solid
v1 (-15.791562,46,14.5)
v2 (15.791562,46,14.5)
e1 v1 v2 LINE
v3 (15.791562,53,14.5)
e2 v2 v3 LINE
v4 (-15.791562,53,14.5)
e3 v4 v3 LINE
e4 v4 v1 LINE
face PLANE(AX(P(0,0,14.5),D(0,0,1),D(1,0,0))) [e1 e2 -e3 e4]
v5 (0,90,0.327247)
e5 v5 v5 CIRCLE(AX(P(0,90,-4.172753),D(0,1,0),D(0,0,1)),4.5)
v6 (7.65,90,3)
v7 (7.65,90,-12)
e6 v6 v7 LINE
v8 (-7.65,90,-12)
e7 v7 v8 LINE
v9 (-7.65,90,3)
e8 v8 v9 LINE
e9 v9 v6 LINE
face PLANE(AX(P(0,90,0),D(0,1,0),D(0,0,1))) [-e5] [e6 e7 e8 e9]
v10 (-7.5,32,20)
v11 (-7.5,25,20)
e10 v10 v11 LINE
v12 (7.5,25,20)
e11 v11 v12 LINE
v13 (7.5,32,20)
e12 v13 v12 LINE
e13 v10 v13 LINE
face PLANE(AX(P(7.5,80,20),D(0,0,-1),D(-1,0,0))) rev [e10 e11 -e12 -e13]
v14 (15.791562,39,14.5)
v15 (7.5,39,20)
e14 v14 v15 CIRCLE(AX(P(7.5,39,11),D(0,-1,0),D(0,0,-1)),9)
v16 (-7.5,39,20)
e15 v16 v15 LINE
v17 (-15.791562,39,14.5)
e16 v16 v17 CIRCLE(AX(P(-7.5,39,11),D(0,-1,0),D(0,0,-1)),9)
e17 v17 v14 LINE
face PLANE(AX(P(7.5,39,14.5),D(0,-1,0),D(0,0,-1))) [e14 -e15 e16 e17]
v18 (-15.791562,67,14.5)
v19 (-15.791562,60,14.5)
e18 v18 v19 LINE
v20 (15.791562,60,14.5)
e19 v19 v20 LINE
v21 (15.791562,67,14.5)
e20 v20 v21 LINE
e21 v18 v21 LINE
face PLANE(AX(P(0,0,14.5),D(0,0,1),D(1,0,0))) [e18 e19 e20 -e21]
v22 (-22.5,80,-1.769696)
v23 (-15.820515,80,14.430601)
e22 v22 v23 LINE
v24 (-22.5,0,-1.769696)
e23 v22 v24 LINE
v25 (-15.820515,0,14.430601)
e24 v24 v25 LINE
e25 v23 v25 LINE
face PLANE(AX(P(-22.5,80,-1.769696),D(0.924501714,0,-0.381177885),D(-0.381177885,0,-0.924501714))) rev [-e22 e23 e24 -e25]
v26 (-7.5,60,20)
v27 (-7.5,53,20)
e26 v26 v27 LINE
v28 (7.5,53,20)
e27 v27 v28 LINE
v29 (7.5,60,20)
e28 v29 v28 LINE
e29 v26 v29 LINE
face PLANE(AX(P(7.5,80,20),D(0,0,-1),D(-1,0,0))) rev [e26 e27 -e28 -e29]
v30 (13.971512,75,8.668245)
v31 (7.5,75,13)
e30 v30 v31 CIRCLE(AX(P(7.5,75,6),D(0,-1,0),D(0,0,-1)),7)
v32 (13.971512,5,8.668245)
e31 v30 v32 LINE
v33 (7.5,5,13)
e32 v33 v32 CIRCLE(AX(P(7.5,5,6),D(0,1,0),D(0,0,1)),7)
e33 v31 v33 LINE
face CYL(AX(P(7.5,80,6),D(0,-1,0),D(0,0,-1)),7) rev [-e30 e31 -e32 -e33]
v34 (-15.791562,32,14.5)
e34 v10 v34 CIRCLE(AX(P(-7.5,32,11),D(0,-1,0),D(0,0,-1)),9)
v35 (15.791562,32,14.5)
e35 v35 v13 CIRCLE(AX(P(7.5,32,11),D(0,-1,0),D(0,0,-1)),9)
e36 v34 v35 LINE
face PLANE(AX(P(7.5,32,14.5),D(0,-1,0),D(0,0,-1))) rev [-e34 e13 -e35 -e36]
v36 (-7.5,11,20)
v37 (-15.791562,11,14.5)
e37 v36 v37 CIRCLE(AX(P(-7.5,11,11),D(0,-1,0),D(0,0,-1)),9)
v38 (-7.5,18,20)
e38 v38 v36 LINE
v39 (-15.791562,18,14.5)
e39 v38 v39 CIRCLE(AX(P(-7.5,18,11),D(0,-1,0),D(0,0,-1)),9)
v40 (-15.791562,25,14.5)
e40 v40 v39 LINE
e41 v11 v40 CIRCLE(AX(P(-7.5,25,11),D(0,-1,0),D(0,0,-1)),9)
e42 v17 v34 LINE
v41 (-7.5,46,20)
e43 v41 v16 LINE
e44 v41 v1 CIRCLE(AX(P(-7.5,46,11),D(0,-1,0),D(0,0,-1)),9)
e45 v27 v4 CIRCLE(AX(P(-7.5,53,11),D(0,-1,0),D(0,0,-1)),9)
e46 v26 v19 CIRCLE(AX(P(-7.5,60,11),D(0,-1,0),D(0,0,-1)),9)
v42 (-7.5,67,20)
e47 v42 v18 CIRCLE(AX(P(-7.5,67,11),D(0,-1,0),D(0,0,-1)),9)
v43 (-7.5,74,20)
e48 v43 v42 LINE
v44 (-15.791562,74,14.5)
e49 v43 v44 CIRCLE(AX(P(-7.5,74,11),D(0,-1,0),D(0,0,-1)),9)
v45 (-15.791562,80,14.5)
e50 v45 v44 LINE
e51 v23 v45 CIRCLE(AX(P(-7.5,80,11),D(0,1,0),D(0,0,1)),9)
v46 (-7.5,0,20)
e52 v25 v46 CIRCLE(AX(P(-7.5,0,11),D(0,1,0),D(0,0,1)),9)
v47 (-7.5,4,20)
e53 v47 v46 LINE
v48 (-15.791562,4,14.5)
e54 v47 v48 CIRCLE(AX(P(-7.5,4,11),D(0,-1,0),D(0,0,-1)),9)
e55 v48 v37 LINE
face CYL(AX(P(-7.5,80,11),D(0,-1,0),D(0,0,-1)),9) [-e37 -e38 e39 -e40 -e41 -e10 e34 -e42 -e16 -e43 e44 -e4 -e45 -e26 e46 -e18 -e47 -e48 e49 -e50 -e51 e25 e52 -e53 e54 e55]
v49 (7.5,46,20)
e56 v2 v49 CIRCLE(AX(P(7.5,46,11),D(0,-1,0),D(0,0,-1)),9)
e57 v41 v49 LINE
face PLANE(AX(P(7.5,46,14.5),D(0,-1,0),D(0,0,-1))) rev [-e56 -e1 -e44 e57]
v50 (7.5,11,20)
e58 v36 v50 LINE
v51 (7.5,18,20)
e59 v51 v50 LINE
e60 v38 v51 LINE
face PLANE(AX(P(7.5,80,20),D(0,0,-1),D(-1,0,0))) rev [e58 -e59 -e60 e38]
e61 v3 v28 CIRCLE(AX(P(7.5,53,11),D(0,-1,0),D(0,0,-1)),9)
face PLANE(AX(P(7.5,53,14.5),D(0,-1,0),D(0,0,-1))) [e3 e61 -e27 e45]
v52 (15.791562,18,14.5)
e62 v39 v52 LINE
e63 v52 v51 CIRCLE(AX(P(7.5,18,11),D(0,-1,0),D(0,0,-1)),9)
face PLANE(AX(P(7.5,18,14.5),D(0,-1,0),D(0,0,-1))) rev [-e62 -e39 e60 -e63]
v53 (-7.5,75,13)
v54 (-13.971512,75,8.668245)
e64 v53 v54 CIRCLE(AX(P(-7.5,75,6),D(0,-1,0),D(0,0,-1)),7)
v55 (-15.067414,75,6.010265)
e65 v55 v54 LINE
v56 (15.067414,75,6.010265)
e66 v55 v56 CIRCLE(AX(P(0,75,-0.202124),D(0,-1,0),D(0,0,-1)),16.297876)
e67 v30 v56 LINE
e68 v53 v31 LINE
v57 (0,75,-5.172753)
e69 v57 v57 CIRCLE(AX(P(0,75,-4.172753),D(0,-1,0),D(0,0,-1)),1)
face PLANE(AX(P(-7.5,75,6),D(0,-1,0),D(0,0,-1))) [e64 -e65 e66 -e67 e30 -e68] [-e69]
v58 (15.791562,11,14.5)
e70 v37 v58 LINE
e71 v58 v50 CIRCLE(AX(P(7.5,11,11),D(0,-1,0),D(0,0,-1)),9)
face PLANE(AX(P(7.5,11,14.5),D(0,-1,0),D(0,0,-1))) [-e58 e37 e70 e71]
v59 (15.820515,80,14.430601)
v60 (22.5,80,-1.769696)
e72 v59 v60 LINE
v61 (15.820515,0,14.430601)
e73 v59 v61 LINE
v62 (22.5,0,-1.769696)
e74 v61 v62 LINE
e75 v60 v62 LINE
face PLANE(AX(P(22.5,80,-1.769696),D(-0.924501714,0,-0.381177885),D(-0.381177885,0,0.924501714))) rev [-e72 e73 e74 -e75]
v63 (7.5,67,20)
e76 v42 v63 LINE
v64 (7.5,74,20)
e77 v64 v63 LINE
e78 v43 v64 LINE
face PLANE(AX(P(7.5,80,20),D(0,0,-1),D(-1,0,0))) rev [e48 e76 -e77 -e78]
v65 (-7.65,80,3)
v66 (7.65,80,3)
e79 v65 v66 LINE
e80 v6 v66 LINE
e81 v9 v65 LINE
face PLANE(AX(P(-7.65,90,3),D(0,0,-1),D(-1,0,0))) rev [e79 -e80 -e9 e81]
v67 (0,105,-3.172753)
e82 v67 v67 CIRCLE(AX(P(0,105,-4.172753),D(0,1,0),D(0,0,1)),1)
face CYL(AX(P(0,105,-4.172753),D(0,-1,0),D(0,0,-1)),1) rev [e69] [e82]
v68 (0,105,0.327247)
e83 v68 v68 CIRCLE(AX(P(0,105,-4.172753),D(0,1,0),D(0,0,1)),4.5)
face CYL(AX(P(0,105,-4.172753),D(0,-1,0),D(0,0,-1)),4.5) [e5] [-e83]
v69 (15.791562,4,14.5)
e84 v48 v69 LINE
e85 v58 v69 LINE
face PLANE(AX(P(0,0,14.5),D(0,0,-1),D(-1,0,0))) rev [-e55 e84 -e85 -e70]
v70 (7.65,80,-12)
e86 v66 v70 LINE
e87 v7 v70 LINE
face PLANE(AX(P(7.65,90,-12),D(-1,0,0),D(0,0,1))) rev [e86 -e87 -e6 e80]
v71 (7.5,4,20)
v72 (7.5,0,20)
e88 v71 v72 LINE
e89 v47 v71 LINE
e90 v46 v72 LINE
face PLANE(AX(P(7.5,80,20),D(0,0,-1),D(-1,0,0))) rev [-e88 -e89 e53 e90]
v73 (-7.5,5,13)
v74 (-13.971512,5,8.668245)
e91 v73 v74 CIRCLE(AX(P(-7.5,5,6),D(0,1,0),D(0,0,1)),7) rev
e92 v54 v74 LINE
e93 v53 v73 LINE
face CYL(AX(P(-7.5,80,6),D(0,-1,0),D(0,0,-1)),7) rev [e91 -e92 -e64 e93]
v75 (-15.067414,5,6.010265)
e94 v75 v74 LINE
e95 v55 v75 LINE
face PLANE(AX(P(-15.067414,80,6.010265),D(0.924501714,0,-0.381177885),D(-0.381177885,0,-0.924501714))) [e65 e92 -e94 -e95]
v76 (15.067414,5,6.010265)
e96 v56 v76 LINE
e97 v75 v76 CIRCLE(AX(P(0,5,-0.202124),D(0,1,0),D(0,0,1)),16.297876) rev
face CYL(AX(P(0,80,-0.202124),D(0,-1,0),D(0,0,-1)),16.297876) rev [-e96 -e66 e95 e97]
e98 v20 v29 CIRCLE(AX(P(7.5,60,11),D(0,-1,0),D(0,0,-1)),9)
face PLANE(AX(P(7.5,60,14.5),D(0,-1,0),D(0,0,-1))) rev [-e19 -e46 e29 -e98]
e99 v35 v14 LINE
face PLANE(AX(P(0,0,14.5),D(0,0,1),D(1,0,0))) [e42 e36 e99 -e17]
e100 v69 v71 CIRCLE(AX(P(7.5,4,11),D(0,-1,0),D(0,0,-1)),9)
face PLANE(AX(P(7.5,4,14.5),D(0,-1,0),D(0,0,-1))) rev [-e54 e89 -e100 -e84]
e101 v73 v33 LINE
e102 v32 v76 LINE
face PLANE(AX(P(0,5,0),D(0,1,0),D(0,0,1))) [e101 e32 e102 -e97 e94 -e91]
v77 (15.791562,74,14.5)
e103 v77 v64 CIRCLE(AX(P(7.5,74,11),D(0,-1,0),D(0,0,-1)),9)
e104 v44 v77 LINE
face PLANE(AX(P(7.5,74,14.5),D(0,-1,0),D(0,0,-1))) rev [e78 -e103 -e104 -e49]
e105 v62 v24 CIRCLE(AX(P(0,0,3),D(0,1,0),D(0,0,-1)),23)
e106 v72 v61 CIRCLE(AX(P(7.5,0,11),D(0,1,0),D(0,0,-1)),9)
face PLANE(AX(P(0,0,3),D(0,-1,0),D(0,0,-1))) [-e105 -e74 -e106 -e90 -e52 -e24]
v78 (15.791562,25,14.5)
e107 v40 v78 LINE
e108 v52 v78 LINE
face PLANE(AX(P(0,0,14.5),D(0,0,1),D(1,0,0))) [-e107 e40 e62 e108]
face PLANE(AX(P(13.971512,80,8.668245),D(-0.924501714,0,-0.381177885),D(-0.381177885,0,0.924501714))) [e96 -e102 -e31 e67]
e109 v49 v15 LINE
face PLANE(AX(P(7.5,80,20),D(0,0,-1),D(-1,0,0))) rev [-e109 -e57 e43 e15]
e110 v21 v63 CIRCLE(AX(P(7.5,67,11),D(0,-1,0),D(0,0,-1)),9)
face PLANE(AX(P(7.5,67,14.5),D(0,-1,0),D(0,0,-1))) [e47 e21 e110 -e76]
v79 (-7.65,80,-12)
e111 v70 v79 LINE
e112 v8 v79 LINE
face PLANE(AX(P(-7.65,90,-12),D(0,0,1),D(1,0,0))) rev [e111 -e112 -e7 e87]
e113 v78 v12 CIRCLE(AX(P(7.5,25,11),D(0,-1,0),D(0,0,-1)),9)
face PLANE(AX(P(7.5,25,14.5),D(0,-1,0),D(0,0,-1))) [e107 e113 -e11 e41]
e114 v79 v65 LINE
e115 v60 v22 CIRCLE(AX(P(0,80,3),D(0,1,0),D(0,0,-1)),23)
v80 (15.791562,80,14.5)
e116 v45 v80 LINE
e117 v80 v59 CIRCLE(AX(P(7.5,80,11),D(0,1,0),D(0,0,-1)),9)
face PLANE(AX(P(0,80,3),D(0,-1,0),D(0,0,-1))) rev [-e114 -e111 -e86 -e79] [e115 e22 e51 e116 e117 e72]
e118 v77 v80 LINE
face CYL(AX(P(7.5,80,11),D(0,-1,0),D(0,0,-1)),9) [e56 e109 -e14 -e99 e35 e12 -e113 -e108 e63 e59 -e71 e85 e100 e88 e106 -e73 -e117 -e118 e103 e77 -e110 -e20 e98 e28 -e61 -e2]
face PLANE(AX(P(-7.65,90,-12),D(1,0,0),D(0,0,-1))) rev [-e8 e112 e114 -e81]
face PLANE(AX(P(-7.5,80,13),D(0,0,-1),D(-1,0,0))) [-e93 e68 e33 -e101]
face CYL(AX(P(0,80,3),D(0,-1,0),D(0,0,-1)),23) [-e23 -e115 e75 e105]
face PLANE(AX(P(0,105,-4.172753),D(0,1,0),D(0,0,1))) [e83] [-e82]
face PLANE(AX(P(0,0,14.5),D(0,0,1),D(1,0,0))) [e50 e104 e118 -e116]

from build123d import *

# Parameters (mm, degrees)
BOSS_EXTRUDE1_DEPTH     = 80
BOSS_EXTRUDE2_DEPTH     = 5
BOSS_EXTRUDE3_START     = 75
BOSS_EXTRUDE3_DEPTH     = 5
CUT_EXTRUDE1_START      = 20
SKETCH2_W               = 31.64103086
SKETCH2_H               = 7
SKETCH2_H_2             = 6
CUT_EXTRUDE1_DEPTH      = 5.5
CROQUIS1_W              = 15.3
CROQUIS1_H              = 15
SALIENTE_EXTRUIR1_DEPTH = 10
CROQUIS2_R              = 4.5
CROQUIS2_R_2            = 1
SALIENTE_EXTRUIR2_DEPTH = 15
CORTAR_EXTRUIR1_START   = -24
CROQUIS2_2_R            = 1
CORTAR_EXTRUIR1_DEPTH   = 24


# Read off the part's stored shape, not the designer's step: Boss-Extrude3
with BuildPart() as part:
    # Sketch1 → Boss-Extrude1 (new body)
    with BuildSketch(Plane(origin=(0, 0, 0), x_dir=(1, 0, 0), z_dir=(0, 1, 0))):
        with BuildLine():
            Line((7.5, -20), (-7.5, -20))
            ThreePointArc((-7.5, -20), (-12.50622569, -18.479151312), (-15.82051543, -14.430600965))
            Line((-15.82051543, -14.430600965), (-22.5, 1.769696007))
            ThreePointArc((-22.5, 1.769696007), (-14.479243624, 14.870408615), (0, 20))
            ThreePointArc((0, 20), (14.479243624, 14.870408615), (22.5, 1.769696007))
            Line((22.5, 1.769696007), (15.82051543, -14.430600965))
            ThreePointArc((15.82051543, -14.430600965), (12.50622569, -18.479151312), (7.5, -20))
        make_face()
        with BuildLine():
            Line((-7.5, -13), (7.5, -13))
            ThreePointArc((7.5, -13), (11.393731092, -11.817117687), (13.971512001, -8.668245195))
            Line((13.971512001, -8.668245195), (15.06741388, -6.010265271))
            ThreePointArc((15.06741388, -6.010265271), (0, 16.5), (-15.06741388, -6.010265271))
            Line((-15.06741388, -6.010265271), (-13.971512001, -8.668245195))
            ThreePointArc((-13.971512001, -8.668245195), (-11.393731092, -11.817117687), (-7.5, -13))
        make_face(mode=Mode.SUBTRACT)
    extrude(amount=BOSS_EXTRUDE1_DEPTH)

    # Sketch1<2> → Boss-Extrude2 (add)
    with BuildSketch(Plane(origin=(0, 0, 0), x_dir=(1, 0, 0), z_dir=(0, 1, 0))):
        with BuildLine():
            ThreePointArc((-13.971512001, -8.668245195), (-11.393731092, -11.817117687), (-7.5, -13))
            Line((-7.5, -13), (7.5, -13))
            ThreePointArc((7.5, -13), (11.393731092, -11.817117687), (13.971512001, -8.668245195))
            Line((13.971512001, -8.668245195), (15.06741388, -6.010265271))
            ThreePointArc((15.06741388, -6.010265271), (0, 16.5), (-15.06741388, -6.010265271))
            Line((-15.06741388, -6.010265271), (-13.971512001, -8.668245195))
        make_face()
    extrude(amount=BOSS_EXTRUDE2_DEPTH)

    # Boss-Extrude3 outline → Boss-Extrude3 (add)
    with BuildSketch(Plane(origin=(0, 0, 0), x_dir=(1, 0, 0), z_dir=(0, 1, 0)).offset(BOSS_EXTRUDE3_START)):
        with BuildLine():
            Line((-15.06741388, -6.010265271), (-13.971512001, -8.668245195))
            ThreePointArc((-13.971512001, -8.668245195), (-11.393731092, -11.817117687), (-7.5, -13))
            Line((-7.5, -13), (7.5, -13))
            ThreePointArc((7.5, -13), (11.393731092, -11.817117687), (13.971512001, -8.668245195))
            Line((13.971512001, -8.668245195), (15.06741388, -6.010265271))
            ThreePointArc((15.06741388, -6.010265271), (0, 16.5), (-15.06741388, -6.010265271))
        make_face()
    extrude(amount=BOSS_EXTRUDE3_DEPTH)

    # Sketch2 → Cut-Extrude1 (cut)
    with BuildSketch(Plane.XY.offset(CUT_EXTRUDE1_START)):
        with Locations((0, 7.5)):
            Rectangle(SKETCH2_W, SKETCH2_H)
        with Locations((0, 21.5)):
            Rectangle(SKETCH2_W, SKETCH2_H)
        with Locations((0, 35.5)):
            Rectangle(SKETCH2_W, SKETCH2_H)
        with Locations((0, 49.5)):
            Rectangle(SKETCH2_W, SKETCH2_H)
        with Locations((0, 63.5)):
            Rectangle(SKETCH2_W, SKETCH2_H)
        with Locations((0, 77)):
            Rectangle(SKETCH2_W, SKETCH2_H_2)
    extrude(amount=-CUT_EXTRUDE1_DEPTH, mode=Mode.SUBTRACT)

    # Croquis1 → Saliente-Extruir1 (add)
    with BuildSketch(Plane(origin=(0, 80, 0), x_dir=(1, 0, 0), z_dir=(0, 1, 0))):
        with Locations((0, 4.5)):
            Rectangle(CROQUIS1_W, CROQUIS1_H)
    extrude(amount=SALIENTE_EXTRUIR1_DEPTH)

    # Croquis2 → Saliente-Extruir2 (add)
    with BuildSketch(Plane(origin=(0, 90, 0), x_dir=(1, 0, 0), z_dir=(0, 1, 0))):
        with Locations(Location((0, 4.172752701, 0), (0, 0, 270))):
            Circle(CROQUIS2_R)
        with Locations(Location((0, 4.172752701, 0), (0, 0, 270))):
            Circle(CROQUIS2_R_2, mode=Mode.SUBTRACT)
    extrude(amount=SALIENTE_EXTRUIR2_DEPTH)

    # Croquis2<2> → Cortar-Extruir1 (cut)
    with BuildSketch(Plane(origin=(0, 90, 0), x_dir=(1, 0, 0), z_dir=(0, 1, 0)).offset(CORTAR_EXTRUIR1_START)):
        with Locations(Location((0, 4.172752701, 0), (0, 0, 90))):
            Circle(CROQUIS2_2_R)
    extrude(amount=CORTAR_EXTRUIR1_DEPTH, mode=Mode.SUBTRACT)


solid = part.part
